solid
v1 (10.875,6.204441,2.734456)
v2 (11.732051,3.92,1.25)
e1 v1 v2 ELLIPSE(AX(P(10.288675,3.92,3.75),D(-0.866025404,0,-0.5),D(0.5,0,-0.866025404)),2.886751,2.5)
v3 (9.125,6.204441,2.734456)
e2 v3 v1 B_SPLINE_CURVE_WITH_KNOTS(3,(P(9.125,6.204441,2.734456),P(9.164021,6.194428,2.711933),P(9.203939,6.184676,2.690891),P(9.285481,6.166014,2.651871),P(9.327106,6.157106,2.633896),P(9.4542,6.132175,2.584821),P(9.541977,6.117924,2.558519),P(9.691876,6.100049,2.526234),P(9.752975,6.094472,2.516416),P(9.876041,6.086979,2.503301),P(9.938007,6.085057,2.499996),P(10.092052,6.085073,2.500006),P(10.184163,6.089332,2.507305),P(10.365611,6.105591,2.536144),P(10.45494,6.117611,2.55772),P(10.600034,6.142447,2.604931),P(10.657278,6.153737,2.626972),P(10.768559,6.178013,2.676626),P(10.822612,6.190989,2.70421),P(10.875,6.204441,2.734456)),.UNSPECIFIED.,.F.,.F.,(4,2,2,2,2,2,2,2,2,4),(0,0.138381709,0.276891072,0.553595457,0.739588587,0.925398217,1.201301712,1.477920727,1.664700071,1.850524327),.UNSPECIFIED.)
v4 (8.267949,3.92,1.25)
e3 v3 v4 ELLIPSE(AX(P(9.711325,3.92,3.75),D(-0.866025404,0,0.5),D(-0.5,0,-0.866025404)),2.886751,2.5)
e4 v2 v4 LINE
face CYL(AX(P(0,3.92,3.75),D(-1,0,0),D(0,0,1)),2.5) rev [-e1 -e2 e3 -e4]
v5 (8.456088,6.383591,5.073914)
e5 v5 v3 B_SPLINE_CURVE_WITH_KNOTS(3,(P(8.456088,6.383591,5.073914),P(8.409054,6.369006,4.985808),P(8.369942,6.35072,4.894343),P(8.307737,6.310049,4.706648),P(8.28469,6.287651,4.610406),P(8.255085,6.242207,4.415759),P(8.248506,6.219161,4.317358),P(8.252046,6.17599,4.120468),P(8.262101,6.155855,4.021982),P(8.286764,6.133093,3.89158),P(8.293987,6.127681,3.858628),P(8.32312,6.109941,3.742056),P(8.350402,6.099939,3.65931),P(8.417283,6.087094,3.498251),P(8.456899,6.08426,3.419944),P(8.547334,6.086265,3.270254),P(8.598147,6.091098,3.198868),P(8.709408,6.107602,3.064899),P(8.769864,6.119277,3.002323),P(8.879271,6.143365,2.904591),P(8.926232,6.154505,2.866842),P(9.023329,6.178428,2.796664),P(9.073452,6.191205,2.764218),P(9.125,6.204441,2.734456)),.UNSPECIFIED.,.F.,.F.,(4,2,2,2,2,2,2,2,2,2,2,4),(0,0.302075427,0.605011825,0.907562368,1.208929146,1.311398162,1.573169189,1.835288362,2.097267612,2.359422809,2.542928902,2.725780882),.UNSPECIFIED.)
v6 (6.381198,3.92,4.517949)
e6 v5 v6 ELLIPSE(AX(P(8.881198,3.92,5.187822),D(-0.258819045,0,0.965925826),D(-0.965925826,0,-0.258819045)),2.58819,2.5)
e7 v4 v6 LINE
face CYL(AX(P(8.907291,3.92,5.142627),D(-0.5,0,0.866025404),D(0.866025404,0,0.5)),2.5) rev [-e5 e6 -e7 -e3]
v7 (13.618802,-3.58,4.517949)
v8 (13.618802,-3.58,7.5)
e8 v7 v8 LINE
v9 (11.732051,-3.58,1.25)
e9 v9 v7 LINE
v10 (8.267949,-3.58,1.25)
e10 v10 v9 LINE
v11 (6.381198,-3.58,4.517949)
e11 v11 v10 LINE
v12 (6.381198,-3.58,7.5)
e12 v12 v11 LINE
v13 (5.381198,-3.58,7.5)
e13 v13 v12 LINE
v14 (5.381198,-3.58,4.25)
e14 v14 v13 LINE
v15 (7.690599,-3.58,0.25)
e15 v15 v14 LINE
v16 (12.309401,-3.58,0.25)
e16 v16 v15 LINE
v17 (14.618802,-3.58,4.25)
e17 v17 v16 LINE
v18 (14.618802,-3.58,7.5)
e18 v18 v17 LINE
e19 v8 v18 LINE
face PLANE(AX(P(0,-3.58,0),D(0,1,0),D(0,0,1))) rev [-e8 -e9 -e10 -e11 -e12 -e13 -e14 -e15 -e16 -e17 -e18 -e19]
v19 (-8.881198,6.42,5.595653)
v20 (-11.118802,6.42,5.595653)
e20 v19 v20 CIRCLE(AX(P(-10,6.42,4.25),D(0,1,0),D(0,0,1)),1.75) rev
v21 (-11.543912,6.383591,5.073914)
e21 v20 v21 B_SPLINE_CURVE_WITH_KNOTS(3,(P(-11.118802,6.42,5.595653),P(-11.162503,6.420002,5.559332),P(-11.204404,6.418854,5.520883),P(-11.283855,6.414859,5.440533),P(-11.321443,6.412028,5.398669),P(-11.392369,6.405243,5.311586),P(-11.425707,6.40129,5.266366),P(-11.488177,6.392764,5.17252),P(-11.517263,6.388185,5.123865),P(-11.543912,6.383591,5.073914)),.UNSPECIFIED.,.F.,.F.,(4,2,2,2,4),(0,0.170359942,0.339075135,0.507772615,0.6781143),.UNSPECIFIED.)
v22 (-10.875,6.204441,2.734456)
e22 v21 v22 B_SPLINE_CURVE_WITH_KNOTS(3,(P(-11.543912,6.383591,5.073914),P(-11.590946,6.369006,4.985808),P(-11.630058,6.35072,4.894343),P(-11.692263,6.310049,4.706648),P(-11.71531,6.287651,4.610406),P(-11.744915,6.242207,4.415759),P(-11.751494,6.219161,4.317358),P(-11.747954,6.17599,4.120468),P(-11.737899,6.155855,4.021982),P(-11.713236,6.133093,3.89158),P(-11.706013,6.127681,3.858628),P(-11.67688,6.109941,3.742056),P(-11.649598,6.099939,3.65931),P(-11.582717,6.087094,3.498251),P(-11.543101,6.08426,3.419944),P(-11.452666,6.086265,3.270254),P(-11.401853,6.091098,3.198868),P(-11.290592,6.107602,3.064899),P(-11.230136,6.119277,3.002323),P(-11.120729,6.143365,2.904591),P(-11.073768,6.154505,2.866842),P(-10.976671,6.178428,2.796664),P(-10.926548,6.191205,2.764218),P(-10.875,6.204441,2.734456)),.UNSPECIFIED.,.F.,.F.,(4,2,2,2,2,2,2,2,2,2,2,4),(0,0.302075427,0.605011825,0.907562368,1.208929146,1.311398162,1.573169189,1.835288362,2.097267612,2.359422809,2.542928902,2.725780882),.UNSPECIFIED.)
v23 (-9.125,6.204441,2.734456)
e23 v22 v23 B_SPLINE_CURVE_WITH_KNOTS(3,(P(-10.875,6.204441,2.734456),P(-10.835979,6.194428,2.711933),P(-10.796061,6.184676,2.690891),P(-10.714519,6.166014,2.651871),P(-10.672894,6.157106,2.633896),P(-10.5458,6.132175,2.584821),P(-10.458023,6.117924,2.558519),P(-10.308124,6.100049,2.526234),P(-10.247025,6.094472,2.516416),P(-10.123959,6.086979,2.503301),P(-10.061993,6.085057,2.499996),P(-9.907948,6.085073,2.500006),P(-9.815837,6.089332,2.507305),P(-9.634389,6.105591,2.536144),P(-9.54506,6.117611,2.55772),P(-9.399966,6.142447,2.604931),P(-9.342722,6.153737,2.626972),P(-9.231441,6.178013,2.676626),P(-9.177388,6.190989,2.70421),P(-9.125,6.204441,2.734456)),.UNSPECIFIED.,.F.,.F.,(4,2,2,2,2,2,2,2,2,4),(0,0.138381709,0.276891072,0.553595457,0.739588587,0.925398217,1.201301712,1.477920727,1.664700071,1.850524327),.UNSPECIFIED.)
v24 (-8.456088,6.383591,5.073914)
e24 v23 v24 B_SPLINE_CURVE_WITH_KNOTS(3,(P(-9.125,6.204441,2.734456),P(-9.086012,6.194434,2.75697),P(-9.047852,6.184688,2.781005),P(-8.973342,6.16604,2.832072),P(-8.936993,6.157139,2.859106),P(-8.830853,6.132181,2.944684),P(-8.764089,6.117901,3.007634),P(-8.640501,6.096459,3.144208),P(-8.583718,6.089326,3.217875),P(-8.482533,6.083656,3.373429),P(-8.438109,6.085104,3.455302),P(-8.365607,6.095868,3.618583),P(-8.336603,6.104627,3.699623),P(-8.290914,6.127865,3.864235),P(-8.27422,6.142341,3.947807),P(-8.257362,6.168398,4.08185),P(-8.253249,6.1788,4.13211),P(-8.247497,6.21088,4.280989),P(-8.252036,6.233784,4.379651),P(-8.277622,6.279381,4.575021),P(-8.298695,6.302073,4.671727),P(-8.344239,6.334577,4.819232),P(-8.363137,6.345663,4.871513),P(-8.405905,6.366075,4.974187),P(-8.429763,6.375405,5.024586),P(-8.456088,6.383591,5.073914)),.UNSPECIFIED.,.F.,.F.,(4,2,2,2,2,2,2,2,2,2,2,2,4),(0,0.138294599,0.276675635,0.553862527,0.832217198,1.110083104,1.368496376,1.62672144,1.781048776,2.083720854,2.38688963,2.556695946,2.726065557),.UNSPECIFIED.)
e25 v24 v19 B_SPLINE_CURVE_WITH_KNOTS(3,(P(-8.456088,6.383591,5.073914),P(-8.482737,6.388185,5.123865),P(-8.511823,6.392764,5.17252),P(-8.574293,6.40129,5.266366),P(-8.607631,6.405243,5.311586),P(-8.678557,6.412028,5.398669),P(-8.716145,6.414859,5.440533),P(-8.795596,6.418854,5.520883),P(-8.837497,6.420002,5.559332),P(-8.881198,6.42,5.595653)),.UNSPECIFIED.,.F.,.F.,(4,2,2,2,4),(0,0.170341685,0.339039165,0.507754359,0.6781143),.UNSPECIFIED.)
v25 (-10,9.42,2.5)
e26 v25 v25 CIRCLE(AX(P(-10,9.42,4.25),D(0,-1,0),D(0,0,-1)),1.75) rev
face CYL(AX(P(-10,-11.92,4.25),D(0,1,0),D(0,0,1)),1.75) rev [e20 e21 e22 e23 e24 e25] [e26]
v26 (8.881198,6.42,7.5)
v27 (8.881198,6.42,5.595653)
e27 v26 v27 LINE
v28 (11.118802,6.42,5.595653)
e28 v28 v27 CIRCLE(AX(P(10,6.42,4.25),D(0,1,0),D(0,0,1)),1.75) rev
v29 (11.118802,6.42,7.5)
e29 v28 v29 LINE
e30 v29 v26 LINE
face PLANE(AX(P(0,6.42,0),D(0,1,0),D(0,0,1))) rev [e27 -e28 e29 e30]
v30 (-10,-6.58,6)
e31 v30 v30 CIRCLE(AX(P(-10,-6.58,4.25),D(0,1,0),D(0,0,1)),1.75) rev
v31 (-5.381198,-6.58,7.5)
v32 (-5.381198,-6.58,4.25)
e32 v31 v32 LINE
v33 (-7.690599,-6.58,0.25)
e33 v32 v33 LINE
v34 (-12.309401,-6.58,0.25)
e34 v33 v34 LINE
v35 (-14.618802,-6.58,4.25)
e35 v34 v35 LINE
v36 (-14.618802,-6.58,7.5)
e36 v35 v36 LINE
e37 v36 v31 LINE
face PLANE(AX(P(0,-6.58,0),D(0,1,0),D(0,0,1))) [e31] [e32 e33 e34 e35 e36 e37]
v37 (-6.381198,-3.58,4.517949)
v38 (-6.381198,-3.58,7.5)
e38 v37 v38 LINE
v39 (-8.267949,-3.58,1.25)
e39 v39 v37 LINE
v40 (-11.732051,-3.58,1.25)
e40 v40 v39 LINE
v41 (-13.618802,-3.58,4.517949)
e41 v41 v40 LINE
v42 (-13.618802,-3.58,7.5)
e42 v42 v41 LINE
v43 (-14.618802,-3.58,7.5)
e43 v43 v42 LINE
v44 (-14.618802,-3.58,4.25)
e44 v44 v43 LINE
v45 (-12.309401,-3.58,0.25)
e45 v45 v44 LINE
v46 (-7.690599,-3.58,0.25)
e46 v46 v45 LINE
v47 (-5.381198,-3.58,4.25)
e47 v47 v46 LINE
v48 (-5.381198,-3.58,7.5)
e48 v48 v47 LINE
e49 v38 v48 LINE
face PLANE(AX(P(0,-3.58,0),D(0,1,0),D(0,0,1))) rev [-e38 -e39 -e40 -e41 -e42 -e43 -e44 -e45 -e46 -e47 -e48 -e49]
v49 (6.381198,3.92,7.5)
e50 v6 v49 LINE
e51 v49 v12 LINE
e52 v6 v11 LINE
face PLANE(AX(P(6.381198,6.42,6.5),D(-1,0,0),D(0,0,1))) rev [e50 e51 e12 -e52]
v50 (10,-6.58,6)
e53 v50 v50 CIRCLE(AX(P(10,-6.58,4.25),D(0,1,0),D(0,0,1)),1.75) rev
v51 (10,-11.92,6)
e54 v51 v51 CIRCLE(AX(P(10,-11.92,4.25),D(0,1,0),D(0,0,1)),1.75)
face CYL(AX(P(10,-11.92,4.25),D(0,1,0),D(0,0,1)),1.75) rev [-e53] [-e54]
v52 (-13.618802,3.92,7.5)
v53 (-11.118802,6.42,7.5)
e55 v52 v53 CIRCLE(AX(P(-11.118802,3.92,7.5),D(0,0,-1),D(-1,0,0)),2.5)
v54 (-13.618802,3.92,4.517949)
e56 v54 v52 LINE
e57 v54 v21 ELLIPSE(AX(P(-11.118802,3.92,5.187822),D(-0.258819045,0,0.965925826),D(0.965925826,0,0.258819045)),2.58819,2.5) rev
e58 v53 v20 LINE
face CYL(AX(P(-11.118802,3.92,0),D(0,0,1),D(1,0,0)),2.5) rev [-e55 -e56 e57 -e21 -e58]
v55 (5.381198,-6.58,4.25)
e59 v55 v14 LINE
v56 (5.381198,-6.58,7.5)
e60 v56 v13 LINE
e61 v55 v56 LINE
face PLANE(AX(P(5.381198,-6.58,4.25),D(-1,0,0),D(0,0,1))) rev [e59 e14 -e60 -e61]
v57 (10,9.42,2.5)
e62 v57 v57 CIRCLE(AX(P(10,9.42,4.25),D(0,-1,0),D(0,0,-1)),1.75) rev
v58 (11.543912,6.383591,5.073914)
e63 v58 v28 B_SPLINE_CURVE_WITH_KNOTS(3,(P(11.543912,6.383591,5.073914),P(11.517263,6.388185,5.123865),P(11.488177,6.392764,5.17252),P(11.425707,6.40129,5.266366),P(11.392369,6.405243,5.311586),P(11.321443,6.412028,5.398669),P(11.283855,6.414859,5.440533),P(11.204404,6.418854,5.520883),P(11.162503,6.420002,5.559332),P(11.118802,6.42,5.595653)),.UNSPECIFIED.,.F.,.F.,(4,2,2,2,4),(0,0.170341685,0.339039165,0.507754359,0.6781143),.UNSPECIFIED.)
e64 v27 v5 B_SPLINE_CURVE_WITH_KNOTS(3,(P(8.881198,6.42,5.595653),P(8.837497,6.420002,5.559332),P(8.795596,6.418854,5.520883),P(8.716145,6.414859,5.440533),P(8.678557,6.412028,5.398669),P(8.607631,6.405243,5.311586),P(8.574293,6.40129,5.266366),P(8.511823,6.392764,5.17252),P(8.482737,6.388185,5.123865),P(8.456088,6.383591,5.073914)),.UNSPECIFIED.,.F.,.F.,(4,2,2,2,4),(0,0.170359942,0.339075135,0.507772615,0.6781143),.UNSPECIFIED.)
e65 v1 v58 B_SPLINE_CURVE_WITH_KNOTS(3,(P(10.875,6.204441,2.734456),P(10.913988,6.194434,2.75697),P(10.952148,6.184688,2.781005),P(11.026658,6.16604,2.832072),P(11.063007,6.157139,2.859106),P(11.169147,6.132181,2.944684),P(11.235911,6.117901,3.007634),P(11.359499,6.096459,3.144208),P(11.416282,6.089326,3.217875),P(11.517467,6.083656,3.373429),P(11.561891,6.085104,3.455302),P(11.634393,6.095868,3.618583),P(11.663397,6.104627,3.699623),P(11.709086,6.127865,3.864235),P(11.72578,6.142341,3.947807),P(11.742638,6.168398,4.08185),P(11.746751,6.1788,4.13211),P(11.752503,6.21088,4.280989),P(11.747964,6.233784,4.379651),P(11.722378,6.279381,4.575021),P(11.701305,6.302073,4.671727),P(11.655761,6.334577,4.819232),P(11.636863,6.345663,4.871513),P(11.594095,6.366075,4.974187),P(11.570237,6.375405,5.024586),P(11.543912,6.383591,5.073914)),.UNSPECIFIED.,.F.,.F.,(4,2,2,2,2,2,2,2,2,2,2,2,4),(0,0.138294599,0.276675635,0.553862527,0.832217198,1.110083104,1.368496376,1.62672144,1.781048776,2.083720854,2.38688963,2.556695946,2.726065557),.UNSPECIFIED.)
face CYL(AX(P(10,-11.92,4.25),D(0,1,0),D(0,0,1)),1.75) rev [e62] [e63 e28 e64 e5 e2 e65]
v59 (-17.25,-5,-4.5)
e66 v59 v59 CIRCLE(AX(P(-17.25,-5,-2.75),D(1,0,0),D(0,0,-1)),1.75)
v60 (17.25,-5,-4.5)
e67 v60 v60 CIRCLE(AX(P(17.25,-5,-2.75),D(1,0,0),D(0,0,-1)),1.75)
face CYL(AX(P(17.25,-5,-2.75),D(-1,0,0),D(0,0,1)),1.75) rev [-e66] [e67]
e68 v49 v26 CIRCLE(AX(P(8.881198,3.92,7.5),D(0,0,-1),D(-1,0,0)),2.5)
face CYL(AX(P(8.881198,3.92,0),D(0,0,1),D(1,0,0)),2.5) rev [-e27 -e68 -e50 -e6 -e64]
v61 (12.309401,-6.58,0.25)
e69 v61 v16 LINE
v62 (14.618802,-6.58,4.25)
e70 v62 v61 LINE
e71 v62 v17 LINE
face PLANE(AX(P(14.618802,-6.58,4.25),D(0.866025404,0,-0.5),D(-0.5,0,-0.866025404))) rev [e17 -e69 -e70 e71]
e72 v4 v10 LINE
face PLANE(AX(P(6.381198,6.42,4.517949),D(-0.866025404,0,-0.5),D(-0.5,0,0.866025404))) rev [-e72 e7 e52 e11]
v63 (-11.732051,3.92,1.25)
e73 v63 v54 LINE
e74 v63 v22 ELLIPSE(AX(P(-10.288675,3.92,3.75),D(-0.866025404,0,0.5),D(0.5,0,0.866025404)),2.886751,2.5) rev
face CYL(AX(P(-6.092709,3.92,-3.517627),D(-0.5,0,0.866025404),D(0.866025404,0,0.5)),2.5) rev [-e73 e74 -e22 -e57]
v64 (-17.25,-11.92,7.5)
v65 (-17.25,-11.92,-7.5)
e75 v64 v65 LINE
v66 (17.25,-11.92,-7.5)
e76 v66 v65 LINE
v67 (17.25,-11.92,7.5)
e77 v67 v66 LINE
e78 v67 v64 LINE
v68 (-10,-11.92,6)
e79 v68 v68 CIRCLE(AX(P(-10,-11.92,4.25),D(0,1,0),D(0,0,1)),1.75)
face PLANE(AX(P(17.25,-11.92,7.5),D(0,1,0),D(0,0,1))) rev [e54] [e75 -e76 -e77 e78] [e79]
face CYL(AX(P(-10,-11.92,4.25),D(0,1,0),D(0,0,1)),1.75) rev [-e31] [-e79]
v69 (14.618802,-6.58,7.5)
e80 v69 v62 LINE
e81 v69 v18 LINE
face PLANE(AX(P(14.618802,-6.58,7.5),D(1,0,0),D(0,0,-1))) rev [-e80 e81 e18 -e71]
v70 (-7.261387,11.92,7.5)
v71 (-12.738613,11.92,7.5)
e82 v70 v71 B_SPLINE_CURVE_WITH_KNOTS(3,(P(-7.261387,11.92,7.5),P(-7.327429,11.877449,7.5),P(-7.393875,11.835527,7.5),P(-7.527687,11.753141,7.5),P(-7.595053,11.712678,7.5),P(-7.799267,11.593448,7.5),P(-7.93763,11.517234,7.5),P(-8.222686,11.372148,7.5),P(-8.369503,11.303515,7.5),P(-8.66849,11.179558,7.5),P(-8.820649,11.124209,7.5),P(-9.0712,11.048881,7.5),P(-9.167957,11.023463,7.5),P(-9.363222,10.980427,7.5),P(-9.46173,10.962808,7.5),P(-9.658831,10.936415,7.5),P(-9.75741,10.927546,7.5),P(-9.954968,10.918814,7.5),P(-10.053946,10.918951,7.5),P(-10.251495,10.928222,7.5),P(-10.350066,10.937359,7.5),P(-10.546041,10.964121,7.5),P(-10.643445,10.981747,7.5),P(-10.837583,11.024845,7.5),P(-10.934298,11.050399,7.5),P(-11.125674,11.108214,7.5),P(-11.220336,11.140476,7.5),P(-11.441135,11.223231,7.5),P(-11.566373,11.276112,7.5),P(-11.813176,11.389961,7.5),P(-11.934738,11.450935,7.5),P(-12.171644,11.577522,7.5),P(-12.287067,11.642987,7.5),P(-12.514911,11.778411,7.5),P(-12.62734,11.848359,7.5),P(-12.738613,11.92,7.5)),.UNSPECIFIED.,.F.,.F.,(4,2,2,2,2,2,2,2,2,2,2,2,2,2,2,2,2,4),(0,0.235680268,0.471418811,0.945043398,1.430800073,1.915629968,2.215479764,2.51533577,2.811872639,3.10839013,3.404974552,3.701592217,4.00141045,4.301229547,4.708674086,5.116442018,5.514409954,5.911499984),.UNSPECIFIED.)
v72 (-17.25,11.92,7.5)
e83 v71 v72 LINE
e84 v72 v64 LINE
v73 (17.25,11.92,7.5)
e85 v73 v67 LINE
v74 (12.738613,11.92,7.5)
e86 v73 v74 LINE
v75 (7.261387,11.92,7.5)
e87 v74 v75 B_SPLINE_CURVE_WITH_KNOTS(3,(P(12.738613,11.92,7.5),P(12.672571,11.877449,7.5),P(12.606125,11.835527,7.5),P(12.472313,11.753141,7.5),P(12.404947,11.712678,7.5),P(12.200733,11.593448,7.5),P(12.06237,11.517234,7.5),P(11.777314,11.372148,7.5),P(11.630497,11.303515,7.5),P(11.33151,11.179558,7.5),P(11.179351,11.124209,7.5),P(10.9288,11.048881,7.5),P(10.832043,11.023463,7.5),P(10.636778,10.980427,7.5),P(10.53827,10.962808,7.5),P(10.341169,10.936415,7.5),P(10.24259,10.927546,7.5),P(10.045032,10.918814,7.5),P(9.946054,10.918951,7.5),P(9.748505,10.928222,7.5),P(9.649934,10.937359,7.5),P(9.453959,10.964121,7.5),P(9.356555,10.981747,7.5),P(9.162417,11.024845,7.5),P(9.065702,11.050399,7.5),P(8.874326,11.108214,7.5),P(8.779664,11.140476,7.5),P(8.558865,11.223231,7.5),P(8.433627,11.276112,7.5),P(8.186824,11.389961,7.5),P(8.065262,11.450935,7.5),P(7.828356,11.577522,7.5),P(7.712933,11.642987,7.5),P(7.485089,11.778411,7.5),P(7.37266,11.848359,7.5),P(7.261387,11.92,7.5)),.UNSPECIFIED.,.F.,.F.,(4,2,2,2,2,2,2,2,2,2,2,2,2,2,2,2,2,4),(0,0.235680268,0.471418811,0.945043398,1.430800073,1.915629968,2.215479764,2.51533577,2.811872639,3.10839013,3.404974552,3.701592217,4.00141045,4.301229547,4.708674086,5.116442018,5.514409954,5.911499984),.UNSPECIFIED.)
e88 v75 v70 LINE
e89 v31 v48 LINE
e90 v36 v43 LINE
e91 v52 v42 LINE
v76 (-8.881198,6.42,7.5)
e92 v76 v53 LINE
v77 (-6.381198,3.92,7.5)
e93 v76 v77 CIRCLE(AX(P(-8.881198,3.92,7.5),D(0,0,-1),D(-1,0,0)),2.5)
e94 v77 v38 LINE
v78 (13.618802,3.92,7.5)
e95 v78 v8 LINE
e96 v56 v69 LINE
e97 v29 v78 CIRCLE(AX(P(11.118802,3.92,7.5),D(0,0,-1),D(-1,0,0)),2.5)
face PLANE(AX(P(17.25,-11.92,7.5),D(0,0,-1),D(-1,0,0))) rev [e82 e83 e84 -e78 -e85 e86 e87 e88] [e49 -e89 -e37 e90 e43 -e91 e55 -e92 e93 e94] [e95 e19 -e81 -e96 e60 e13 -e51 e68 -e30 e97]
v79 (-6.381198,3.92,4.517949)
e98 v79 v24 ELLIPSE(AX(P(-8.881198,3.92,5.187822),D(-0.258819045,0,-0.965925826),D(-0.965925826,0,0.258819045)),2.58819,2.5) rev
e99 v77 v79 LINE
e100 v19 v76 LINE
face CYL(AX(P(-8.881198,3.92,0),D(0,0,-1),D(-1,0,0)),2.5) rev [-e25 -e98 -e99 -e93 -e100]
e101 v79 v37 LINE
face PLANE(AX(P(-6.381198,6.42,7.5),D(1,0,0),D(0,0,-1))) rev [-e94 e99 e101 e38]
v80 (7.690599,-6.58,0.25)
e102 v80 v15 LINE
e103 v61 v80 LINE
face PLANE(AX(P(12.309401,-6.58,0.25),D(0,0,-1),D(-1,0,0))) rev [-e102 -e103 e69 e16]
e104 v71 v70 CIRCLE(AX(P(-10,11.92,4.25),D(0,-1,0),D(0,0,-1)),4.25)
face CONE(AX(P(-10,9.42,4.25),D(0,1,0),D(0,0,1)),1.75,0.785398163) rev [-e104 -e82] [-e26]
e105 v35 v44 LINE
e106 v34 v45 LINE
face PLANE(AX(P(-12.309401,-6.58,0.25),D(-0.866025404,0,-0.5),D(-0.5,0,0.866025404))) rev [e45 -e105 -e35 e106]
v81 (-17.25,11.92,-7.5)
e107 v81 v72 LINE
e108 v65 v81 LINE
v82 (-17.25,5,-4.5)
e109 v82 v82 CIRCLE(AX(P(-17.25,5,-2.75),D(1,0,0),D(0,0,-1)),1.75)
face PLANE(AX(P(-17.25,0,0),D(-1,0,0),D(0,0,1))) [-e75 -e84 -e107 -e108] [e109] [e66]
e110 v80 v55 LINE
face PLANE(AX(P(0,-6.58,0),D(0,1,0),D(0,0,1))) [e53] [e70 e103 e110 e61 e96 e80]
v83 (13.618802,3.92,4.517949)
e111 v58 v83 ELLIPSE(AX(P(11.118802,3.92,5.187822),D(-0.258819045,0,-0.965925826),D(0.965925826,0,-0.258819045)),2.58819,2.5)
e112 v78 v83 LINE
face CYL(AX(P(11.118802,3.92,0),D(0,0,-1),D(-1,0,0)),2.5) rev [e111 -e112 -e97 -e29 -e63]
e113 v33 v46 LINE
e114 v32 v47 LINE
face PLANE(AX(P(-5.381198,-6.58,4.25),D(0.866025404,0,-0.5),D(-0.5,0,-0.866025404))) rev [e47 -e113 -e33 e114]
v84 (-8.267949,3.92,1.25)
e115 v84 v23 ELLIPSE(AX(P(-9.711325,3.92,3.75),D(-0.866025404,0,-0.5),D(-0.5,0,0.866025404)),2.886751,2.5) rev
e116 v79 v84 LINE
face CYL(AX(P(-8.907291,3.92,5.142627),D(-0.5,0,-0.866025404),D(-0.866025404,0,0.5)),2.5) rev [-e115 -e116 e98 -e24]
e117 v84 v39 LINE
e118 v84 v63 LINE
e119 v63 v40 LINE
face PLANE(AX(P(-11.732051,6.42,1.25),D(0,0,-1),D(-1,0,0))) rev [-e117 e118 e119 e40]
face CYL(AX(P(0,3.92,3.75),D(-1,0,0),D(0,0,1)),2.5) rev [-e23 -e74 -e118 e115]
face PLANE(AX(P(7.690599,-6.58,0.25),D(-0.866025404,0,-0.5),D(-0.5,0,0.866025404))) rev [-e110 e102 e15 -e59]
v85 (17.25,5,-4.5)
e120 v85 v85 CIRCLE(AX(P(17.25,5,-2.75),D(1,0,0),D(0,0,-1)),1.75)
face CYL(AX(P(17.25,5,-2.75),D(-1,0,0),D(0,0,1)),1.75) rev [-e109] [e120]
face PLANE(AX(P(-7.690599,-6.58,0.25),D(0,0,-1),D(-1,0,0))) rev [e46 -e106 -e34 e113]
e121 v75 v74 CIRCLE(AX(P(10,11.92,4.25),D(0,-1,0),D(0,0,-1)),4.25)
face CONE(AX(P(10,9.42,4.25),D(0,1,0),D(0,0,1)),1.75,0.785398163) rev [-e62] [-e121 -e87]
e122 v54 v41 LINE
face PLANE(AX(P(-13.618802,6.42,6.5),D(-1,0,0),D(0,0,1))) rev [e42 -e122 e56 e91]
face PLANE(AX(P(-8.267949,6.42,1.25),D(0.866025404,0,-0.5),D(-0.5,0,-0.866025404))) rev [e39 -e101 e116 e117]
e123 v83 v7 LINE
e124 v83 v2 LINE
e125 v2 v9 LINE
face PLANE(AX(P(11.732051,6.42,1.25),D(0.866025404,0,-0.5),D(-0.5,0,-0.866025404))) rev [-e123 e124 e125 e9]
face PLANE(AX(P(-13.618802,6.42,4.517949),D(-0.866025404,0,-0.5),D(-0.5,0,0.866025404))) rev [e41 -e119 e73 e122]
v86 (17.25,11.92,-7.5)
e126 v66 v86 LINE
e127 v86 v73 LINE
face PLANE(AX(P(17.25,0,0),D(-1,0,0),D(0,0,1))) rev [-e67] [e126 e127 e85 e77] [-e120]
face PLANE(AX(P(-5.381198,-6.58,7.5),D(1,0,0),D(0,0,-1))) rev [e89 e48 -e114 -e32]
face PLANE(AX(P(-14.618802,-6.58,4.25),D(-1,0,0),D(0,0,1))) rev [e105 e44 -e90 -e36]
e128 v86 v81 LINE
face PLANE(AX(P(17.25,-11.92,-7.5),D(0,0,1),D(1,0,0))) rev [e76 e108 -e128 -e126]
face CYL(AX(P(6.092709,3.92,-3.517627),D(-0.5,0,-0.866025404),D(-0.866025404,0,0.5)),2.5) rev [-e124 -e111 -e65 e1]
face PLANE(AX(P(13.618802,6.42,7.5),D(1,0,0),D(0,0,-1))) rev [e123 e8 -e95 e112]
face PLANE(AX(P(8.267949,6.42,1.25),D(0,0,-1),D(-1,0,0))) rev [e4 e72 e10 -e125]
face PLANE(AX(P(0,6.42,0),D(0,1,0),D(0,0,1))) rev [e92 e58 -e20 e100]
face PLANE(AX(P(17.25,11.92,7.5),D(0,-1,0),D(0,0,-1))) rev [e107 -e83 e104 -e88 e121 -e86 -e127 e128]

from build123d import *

# Parameters (mm, degrees)
SKETCH1_W           = 15
SKETCH1_H           = 23.84
SKETCH1_R           = 1.75
BOSS_EXTRUDE1_DEPTH = 17.25
SKETCH2_R           = 1.75
CUT_EXTRUDE1_DEPTH  = 31.367056163
CHAMFER1_SIZE       = 2.5
CUT_EXTRUDE2_DEPTH  = 1.5
CUT_EXTRUDE3_DEPTH  = 10
FILLET2_R           = 2.5


with BuildPart() as part:
    # Sketch1 → Boss-Extrude1 (new, symmetric)
    with BuildSketch(Plane(origin=(0, 0, 0), x_dir=(0, 0, -1), z_dir=(1, 0, 0))):
        Rectangle(SKETCH1_W, SKETCH1_H)
        with Locations((2.75, 5)):
            Circle(SKETCH1_R, mode=Mode.SUBTRACT)
        with Locations((2.75, -5)):
            Circle(SKETCH1_R, mode=Mode.SUBTRACT)
    extrude(amount=BOSS_EXTRUDE1_DEPTH, both=True)

    # Sketch2 → Cut-Extrude1 (cut, through all)
    with BuildSketch(Plane(origin=(0, 11.92, 0), x_dir=(1, 0, 0), z_dir=(0, 1, 0))):
        with Locations(Location((-10, -4.25, 0), (0, 0, 270))):
            Circle(SKETCH2_R)
        with Locations(Location((10, -4.25, 0), (0, 0, 270))):
            Circle(SKETCH2_R)
    extrude(amount=-CUT_EXTRUDE1_DEPTH, mode=Mode.SUBTRACT)

    # Chamfer1
    # the kernel refuses this chamfer: 2.5 mm, written as the material it takes off along each edge
    with BuildSketch(Plane(origin=(-10, 11.92, 4.25), x_dir=(0, 0, 1), z_dir=(-1, 0, 0))) as chamfer1_piece_1:
        Polygon((1.75, -CHAMFER1_SIZE), (1.75 + CHAMFER1_SIZE, 0), (1.75, 0), align=None)
    revolve(axis=Axis((-10, 11.92, 4.25), (0, 1, 0)), mode=Mode.SUBTRACT)
    with BuildSketch(Plane(origin=(10, 11.92, 4.25), x_dir=(0, 0, 1), z_dir=(-1, 0, 0))) as chamfer1_piece_2:
        Polygon((1.75, -CHAMFER1_SIZE), (1.75 + CHAMFER1_SIZE, 0), (1.75, 0), align=None)
    revolve(axis=Axis((10, 11.92, 4.25), (0, 1, 0)), mode=Mode.SUBTRACT)

    # Sketch3 → Cut-Extrude2 (cut, symmetric)
    with BuildSketch(Plane(origin=(0, -5.08, 0), x_dir=(1, 0, 0), z_dir=(0, 1, 0))):
        Polygon((-14.618802154, -4.25), (-14.618802154, -7.5), (-5.381197846, -7.5), (-5.381197846, -4.25), (-7.690598923, -0.25), (-12.309401077, -0.25), align=None)
        Polygon((14.618802154, -4.25), (12.309401077, -0.25), (7.690598923, -0.25), (5.381197846, -4.25), (5.381197846, -7.5), (14.618802154, -7.5), align=None)
    extrude(amount=CUT_EXTRUDE2_DEPTH, both=True, mode=Mode.SUBTRACT)

    # Sketch4 → Cut-Extrude3 (cut)
    with BuildSketch(Plane.XZ.offset(3.58)):
        Polygon((-13.618802154, 6.5), (-13.618802154, 7.5), (-6.381197846, 7.5), (-6.381197846, 6.5), (-6.381197846, 4.517949192), (-8.267949192, 1.25), (-11.732050808, 1.25), (-13.618802154, 4.517949192), align=None)
        Polygon((6.381197846, 6.5), (6.381197846, 7.5), (13.618802154, 7.5), (13.618802154, 6.5), (13.618802154, 4.517949192), (11.732050808, 1.25), (8.267949192, 1.25), (6.381197846, 4.517949192), align=None)
    extrude(amount=-CUT_EXTRUDE3_DEPTH, mode=Mode.SUBTRACT)

    # Fillet2
    # the kernel refuses this fillet: 2.5 mm, written as the material it adds along each edge
    with BuildSketch(Plane(origin=(-6.381197846, 6.42, -1.732050808), x_dir=(0, -1, 0), z_dir=(0, 0, 1))) as fillet2_piece_1_section:
        with BuildLine():
            CenterArc((FILLET2_R, -FILLET2_R), FILLET2_R, 90, 90)
            Line((0, -FILLET2_R), (0, 0))
            Line((0, 0), (FILLET2_R, 0))
        make_face()
    fillet2_piece_1 = extrude(amount=9.232050808, mode=Mode.PRIVATE)
    fillet2_piece_1 = fillet2_piece_1 - Plane(origin=(-10, 5.915860335, 4.25), x_dir=(0, 0, 1), z_dir=(0, 1, 0)) * Cylinder(1.75, 29, mode=Mode.PRIVATE)
    fillet2_piece_1 = split(fillet2_piece_1, bisect_by=Plane(origin=(-7.028837061, 5.915860335, 1.25), z_dir=(0, 0, 1)), keep=Keep.TOP, mode=Mode.PRIVATE)
    add(fillet2_piece_1)
    with BuildSketch(Plane(origin=(-3.256197846, 6.42, 9.930607966), x_dir=(-0.8660254037844386, 0, 0.5000000000000002), z_dir=(-0.5000000000000002, 0, -0.8660254037844386))) as fillet2_piece_2_section:
        with BuildLine():
            CenterArc((FILLET2_R, -FILLET2_R), FILLET2_R, 90, 90)
            Line((0, -FILLET2_R), (0, 0))
            Line((0, 0), (FILLET2_R, 0))
        make_face()
    fillet2_piece_2 = extrude(amount=16.273502692, mode=Mode.PRIVATE)
    fillet2_piece_2 = split(fillet2_piece_2, bisect_by=Plane(origin=(-7.669827192, 5.902188102, 7.5), z_dir=(0, 0, -1)), keep=Keep.TOP, mode=Mode.PRIVATE)
    fillet2_piece_2 = fillet2_piece_2 - Plane(origin=(-10, 5.902188102, 4.25), x_dir=(0, 0, 1), z_dir=(0, 1, 0)) * Cylinder(1.75, 43, mode=Mode.PRIVATE)
    fillet2_piece_2 = split(fillet2_piece_2, bisect_by=Plane(origin=(-7.669827192, 5.902188102, 1.25), z_dir=(0, 0, 1)), keep=Keep.TOP, mode=Mode.PRIVATE)
    add(fillet2_piece_2)
    with BuildSketch(Plane(origin=(-2.017949192, 6.42, 1.25), x_dir=(0, 0, 1), z_dir=(-1, 0, 0))) as fillet2_piece_3_section:
        with BuildLine():
            CenterArc((FILLET2_R, -FILLET2_R), FILLET2_R, 90, 90)
            Line((0, -FILLET2_R), (0, 0))
            Line((0, 0), (FILLET2_R, 0))
        make_face()
    fillet2_piece_3 = extrude(amount=15.964101615, mode=Mode.PRIVATE)
    fillet2_piece_3 = fillet2_piece_3 - Plane(origin=(-10, 5.877722241, 4.25), x_dir=(0, 0, 1), z_dir=(0, 1, 0)) * Cylinder(1.75, 42, mode=Mode.PRIVATE)
    fillet2_piece_3 = split(fillet2_piece_3, bisect_by=Plane(origin=(-11.54711457, 5.877722241, 0.92968104), z_dir=(0.8660254037844384, 0, 0.5000000000000006)), keep=Keep.TOP, mode=Mode.PRIVATE)
    add(fillet2_piece_3)
    with BuildSketch(Plane(origin=(-8.607050808, 6.42, -4.162658774), x_dir=(0.8660254037844384, 0, 0.5000000000000004), z_dir=(-0.5000000000000006, 0, 0.8660254037844384))) as fillet2_piece_4_section:
        with BuildLine():
            CenterArc((FILLET2_R, -FILLET2_R), FILLET2_R, 90, 90)
            Line((0, -FILLET2_R), (0, 0))
            Line((0, 0), (FILLET2_R, 0))
        make_face()
    fillet2_piece_4 = extrude(amount=16.273502692, mode=Mode.PRIVATE)
    fillet2_piece_4 = split(fillet2_piece_4, bisect_by=Plane(origin=(-12.330172795, 5.902188104, 7.5), z_dir=(0, 0, -1)), keep=Keep.TOP, mode=Mode.PRIVATE)
    fillet2_piece_4 = fillet2_piece_4 - Plane(origin=(-10, 5.902188104, 4.25), x_dir=(0, 0, 1), z_dir=(0, 1, 0)) * Cylinder(1.75, 43, mode=Mode.PRIVATE)
    fillet2_piece_4 = split(fillet2_piece_4, bisect_by=Plane(origin=(-12.330172795, 5.902188104, 1.25), z_dir=(0, 0, 1)), keep=Keep.TOP, mode=Mode.PRIVATE)
    add(fillet2_piece_4)
    with BuildSketch(Plane(origin=(-13.618802154, 6.42, 7.5), x_dir=(1, 0, 0), z_dir=(0, 0, -1))) as fillet2_piece_5_section:
        with BuildLine():
            CenterArc((FILLET2_R, FILLET2_R), FILLET2_R, 180, 90)
            Line((0, FILLET2_R), (0, 0))
            Line((0, 0), (FILLET2_R, 0))
        make_face()
    fillet2_piece_5 = extrude(amount=9.232050808, mode=Mode.PRIVATE)
    fillet2_piece_5 = fillet2_piece_5 - Plane(origin=(-10, 5.915860467, 4.25), x_dir=(0, 0, 1), z_dir=(0, 1, 0)) * Cylinder(1.75, 29, mode=Mode.PRIVATE)
    fillet2_piece_5 = split(fillet2_piece_5, bisect_by=Plane(origin=(-13.860643718, 5.915860467, 4.936831069), z_dir=(0.8660254037844384, 0, 0.5000000000000006)), keep=Keep.TOP, mode=Mode.PRIVATE)
    add(fillet2_piece_5)
    with BuildSketch(Plane(origin=(13.618802154, 6.42, -1.732050808), x_dir=(0, -1, 0), z_dir=(0, 0, 1))) as fillet2_piece_6_section:
        with BuildLine():
            CenterArc((FILLET2_R, -FILLET2_R), FILLET2_R, 90, 90)
            Line((0, -FILLET2_R), (0, 0))
            Line((0, 0), (FILLET2_R, 0))
        make_face()
    fillet2_piece_6 = extrude(amount=9.232050808, mode=Mode.PRIVATE)
    fillet2_piece_6 = fillet2_piece_6 - Plane(origin=(10, 5.915860335, 4.25), x_dir=(0, 0, 1), z_dir=(0, 1, 0)) * Cylinder(1.75, 29, mode=Mode.PRIVATE)
    fillet2_piece_6 = split(fillet2_piece_6, bisect_by=Plane(origin=(12.971162939, 5.915860335, 1.25), z_dir=(0, 0, 1)), keep=Keep.TOP, mode=Mode.PRIVATE)
    add(fillet2_piece_6)
    with BuildSketch(Plane(origin=(16.743802154, 6.42, 9.930607966), x_dir=(-0.8660254037844389, 0, 0.49999999999999956), z_dir=(-0.4999999999999996, 0, -0.8660254037844389))) as fillet2_piece_7_section:
        with BuildLine():
            CenterArc((FILLET2_R, -FILLET2_R), FILLET2_R, 90, 90)
            Line((0, -FILLET2_R), (0, 0))
            Line((0, 0), (FILLET2_R, 0))
        make_face()
    fillet2_piece_7 = extrude(amount=16.273502692, mode=Mode.PRIVATE)
    fillet2_piece_7 = split(fillet2_piece_7, bisect_by=Plane(origin=(12.330172808, 5.902188102, 7.5), z_dir=(0, 0, -1)), keep=Keep.TOP, mode=Mode.PRIVATE)
    fillet2_piece_7 = fillet2_piece_7 - Plane(origin=(10, 5.902188102, 4.25), x_dir=(0, 0, 1), z_dir=(0, 1, 0)) * Cylinder(1.75, 43, mode=Mode.PRIVATE)
    fillet2_piece_7 = split(fillet2_piece_7, bisect_by=Plane(origin=(12.330172808, 5.902188102, 1.25), z_dir=(0, 0, 1)), keep=Keep.TOP, mode=Mode.PRIVATE)
    add(fillet2_piece_7)
    with BuildSketch(Plane(origin=(17.982050808, 6.42, 1.25), x_dir=(0, 0, 1), z_dir=(-1, 0, 0))) as fillet2_piece_8_section:
        with BuildLine():
            CenterArc((FILLET2_R, -FILLET2_R), FILLET2_R, 90, 90)
            Line((0, -FILLET2_R), (0, 0))
            Line((0, 0), (FILLET2_R, 0))
        make_face()
    fillet2_piece_8 = extrude(amount=15.964101615, mode=Mode.PRIVATE)
    fillet2_piece_8 = fillet2_piece_8 - Plane(origin=(10, 5.877722241, 4.25), x_dir=(0, 0, 1), z_dir=(0, 1, 0)) * Cylinder(1.75, 42, mode=Mode.PRIVATE)
    fillet2_piece_8 = split(fillet2_piece_8, bisect_by=Plane(origin=(11.547114576, 5.877722241, 0.92968105), z_dir=(-0.8660254037844389, 0, 0.4999999999999996)), keep=Keep.TOP, mode=Mode.PRIVATE)
    add(fillet2_piece_8)
    with BuildSketch(Plane(origin=(11.392949192, 6.42, -4.162658774), x_dir=(0.8660254037844389, 0, 0.49999999999999956), z_dir=(-0.4999999999999996, 0, 0.8660254037844389))) as fillet2_piece_9_section:
        with BuildLine():
            CenterArc((FILLET2_R, -FILLET2_R), FILLET2_R, 90, 90)
            Line((0, -FILLET2_R), (0, 0))
            Line((0, 0), (FILLET2_R, 0))
        make_face()
    fillet2_piece_9 = extrude(amount=16.273502692, mode=Mode.PRIVATE)
    fillet2_piece_9 = split(fillet2_piece_9, bisect_by=Plane(origin=(7.669827205, 5.902188104, 7.5), z_dir=(0, 0, -1)), keep=Keep.TOP, mode=Mode.PRIVATE)
    fillet2_piece_9 = fillet2_piece_9 - Plane(origin=(10, 5.902188104, 4.25), x_dir=(0, 0, 1), z_dir=(0, 1, 0)) * Cylinder(1.75, 43, mode=Mode.PRIVATE)
    fillet2_piece_9 = split(fillet2_piece_9, bisect_by=Plane(origin=(7.669827205, 5.902188104, 1.25), z_dir=(0, 0, 1)), keep=Keep.TOP, mode=Mode.PRIVATE)
    add(fillet2_piece_9)
    with BuildSketch(Plane(origin=(6.381197846, 6.42, 7.5), x_dir=(1, 0, 0), z_dir=(0, 0, -1))) as fillet2_piece_10_section:
        with BuildLine():
            CenterArc((FILLET2_R, FILLET2_R), FILLET2_R, 180, 90)
            Line((0, FILLET2_R), (0, 0))
            Line((0, 0), (FILLET2_R, 0))
        make_face()
    fillet2_piece_10 = extrude(amount=9.232050808, mode=Mode.PRIVATE)
    fillet2_piece_10 = fillet2_piece_10 - Plane(origin=(10, 5.915860467, 4.25), x_dir=(0, 0, 1), z_dir=(0, 1, 0)) * Cylinder(1.75, 29, mode=Mode.PRIVATE)
    fillet2_piece_10 = split(fillet2_piece_10, bisect_by=Plane(origin=(6.139356282, 5.915860467, 4.936831069), z_dir=(0.8660254037844389, 0, 0.4999999999999996)), keep=Keep.TOP, mode=Mode.PRIVATE)
    add(fillet2_piece_10)


solid = part.part
